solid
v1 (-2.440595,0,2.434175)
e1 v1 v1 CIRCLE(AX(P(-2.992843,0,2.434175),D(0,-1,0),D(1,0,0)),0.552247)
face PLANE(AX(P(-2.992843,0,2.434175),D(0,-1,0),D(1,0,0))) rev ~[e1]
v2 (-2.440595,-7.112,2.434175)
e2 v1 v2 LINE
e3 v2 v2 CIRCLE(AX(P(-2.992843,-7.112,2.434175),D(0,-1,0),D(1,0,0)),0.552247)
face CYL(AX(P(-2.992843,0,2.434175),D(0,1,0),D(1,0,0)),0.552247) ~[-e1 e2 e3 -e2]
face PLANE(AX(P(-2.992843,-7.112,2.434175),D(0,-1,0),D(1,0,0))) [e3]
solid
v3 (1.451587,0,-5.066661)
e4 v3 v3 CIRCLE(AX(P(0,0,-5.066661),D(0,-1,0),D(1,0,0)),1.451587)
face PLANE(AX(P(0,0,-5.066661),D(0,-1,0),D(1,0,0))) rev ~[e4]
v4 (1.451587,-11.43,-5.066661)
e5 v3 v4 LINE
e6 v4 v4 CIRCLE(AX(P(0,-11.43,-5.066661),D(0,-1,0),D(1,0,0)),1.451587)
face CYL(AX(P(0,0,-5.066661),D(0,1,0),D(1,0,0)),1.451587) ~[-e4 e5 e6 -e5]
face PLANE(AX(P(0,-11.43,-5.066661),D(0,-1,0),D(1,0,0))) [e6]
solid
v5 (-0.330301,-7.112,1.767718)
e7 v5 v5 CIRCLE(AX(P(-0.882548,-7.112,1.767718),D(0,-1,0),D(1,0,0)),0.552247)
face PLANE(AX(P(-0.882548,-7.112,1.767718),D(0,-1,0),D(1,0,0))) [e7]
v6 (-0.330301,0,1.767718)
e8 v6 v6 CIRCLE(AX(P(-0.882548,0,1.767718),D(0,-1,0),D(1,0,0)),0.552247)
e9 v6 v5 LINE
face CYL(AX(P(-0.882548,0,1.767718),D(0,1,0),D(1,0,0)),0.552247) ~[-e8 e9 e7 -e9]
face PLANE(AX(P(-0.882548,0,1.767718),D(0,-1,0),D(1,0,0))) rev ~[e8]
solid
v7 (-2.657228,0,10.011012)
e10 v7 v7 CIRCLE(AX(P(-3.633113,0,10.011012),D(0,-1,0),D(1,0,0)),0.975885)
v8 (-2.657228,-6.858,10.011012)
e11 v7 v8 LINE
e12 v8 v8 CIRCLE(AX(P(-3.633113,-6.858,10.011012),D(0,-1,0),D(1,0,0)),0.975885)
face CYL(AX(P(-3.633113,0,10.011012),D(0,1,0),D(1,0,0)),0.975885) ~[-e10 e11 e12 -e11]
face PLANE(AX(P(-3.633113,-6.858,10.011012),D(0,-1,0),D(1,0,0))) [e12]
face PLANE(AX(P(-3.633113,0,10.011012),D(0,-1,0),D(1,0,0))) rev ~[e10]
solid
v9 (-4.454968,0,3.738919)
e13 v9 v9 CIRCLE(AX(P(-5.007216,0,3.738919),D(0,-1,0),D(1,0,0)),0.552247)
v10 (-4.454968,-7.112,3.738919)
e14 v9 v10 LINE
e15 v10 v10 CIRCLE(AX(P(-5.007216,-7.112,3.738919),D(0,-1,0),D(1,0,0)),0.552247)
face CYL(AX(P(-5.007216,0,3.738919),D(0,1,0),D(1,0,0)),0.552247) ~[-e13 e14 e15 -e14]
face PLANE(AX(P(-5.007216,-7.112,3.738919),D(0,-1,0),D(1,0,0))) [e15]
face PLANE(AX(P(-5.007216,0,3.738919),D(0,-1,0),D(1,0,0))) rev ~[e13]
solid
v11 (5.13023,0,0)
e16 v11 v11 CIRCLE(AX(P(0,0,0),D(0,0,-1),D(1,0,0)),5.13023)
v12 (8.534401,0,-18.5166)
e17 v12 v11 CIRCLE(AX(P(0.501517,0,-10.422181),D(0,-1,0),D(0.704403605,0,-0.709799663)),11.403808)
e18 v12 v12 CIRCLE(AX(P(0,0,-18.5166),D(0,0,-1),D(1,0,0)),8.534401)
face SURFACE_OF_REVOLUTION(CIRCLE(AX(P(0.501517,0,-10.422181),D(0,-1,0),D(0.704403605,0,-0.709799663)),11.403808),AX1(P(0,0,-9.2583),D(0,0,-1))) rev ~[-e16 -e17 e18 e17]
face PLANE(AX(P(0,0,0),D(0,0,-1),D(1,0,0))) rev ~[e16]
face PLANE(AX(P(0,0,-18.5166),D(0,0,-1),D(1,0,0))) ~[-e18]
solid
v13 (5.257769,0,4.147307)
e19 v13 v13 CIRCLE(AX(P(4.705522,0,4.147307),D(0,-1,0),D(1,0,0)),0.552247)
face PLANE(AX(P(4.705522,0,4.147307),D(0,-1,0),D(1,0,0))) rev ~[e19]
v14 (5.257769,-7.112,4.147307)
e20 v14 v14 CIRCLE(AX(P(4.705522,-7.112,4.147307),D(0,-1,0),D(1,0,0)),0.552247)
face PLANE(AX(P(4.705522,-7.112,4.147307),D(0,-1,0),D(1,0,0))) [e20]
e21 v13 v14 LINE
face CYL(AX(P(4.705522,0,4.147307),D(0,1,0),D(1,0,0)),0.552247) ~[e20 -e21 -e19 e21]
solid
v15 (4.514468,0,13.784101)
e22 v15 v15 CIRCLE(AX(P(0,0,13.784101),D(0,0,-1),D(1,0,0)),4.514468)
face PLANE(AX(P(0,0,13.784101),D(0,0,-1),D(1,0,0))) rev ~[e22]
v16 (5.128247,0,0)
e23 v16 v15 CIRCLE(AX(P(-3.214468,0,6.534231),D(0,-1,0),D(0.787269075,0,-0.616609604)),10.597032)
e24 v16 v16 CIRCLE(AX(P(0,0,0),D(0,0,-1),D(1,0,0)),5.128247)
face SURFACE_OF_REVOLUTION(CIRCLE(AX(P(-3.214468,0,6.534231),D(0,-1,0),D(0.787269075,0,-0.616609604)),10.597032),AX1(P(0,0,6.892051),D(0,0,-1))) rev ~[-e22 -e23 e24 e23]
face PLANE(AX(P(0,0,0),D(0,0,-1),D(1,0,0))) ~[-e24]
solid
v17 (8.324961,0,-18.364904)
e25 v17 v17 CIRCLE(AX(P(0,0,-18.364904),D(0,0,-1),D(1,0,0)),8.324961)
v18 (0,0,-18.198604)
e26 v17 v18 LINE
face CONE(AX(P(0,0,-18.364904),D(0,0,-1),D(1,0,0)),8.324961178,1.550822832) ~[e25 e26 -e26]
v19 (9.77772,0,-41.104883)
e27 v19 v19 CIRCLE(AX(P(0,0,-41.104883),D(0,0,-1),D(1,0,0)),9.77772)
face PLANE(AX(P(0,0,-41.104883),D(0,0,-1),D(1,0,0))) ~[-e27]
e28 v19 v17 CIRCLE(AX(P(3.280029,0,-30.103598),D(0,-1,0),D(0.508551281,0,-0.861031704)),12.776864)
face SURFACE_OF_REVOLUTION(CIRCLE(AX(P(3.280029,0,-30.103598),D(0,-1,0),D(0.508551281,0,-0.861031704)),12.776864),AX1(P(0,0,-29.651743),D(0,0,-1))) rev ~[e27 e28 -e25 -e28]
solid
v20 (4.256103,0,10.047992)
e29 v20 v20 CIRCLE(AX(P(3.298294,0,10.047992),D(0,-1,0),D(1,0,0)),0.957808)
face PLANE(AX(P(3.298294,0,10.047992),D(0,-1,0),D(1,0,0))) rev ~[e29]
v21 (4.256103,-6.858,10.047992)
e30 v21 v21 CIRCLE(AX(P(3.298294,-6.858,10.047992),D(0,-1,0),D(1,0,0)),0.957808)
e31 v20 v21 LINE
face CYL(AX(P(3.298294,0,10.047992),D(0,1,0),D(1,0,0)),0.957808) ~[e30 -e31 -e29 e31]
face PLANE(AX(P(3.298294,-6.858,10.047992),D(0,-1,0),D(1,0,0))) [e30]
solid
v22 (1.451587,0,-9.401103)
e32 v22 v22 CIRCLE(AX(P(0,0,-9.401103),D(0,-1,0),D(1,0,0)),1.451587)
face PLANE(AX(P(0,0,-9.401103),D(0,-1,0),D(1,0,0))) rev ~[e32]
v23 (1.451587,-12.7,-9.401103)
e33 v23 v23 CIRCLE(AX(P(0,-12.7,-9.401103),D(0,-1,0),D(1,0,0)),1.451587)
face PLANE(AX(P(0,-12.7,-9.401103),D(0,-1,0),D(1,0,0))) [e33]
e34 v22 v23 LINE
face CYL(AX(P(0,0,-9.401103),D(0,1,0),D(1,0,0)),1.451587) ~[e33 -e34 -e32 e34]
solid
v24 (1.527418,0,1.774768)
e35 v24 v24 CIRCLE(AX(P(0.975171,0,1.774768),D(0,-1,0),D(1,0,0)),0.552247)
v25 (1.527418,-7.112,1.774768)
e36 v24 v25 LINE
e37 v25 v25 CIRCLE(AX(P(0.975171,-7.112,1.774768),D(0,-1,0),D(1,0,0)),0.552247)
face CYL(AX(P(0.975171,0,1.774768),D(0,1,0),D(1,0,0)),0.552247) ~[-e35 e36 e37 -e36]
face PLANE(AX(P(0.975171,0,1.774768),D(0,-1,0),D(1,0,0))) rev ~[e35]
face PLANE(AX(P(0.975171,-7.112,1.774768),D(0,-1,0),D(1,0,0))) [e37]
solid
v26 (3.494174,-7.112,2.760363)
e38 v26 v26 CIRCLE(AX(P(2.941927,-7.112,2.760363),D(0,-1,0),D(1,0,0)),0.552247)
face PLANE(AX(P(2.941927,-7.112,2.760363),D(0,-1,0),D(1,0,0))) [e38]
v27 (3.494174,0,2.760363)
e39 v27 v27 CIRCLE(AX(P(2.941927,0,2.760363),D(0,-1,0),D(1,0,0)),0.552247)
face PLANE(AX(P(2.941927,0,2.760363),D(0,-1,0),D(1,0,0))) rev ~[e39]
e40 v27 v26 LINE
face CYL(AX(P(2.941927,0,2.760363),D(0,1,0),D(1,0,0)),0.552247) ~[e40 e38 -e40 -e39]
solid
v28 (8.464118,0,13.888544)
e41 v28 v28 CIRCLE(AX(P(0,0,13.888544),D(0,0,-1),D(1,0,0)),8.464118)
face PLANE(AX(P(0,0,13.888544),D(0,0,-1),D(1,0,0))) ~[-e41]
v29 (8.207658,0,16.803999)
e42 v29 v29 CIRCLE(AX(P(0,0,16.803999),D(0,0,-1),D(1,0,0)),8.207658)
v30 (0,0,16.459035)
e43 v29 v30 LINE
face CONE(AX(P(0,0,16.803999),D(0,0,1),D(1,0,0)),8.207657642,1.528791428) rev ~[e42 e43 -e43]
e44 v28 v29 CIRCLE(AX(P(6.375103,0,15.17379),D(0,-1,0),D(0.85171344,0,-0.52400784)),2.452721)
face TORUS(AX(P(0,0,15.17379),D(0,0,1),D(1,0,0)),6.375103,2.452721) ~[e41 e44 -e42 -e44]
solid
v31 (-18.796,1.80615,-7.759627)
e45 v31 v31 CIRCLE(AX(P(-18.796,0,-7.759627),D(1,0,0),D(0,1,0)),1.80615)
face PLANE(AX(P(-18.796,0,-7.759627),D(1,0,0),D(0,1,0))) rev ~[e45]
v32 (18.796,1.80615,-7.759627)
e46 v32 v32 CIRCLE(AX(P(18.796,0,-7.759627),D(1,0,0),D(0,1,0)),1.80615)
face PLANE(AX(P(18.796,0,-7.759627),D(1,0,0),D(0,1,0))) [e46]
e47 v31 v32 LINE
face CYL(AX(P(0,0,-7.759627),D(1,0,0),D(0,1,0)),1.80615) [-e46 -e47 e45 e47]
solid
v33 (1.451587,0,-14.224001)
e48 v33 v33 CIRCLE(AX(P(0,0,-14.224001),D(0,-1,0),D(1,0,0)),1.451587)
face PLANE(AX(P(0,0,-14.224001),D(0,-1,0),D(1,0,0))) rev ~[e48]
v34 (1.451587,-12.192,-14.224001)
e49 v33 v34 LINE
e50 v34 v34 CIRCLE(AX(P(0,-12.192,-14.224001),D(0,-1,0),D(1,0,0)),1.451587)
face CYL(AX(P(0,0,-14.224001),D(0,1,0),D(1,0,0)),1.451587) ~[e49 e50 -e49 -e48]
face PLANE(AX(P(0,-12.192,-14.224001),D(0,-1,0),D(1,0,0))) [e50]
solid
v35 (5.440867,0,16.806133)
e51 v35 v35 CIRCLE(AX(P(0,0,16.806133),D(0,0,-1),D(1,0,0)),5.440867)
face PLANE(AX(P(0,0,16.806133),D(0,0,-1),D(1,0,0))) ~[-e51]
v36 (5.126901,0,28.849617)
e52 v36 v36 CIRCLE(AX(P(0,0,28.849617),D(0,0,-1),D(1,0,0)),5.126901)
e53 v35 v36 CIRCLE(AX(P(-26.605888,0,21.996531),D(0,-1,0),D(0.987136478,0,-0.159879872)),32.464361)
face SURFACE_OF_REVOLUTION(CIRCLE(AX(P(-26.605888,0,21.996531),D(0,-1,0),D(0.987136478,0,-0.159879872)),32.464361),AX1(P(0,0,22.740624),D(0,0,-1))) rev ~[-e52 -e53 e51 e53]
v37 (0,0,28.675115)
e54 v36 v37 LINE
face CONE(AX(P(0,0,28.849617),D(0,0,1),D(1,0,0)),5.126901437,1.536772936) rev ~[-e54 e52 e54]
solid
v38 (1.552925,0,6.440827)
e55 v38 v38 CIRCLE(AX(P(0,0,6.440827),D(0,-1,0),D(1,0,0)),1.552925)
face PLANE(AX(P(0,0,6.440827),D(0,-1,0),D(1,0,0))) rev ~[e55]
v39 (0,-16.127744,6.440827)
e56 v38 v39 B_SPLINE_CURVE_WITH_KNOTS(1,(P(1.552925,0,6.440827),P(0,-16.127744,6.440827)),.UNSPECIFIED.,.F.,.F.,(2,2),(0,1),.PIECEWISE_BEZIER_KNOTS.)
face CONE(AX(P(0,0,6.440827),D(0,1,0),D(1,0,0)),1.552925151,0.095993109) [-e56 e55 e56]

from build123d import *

# Parameters (mm, degrees)
F10_R     = 2.9031743956
F11_DEPTH = 22.86
F12_R     = 2.9031743956
F13_DEPTH = 25.4
F14_R     = 2.9031743956
F15_DEPTH = 24.384
F16_R     = 1.9156165745
F17_DEPTH = 13.716
F16_R_2   = 1.9517692667
F18_R     = 1.1044945862
F19_DEPTH = 14.224
F20_R     = 3.1058503017
F22_R     = 3.6123006976
F23_DEPTH = 37.592
F24_SCALE = 0.5


# Not quite as in the source:
# - an extrude whose draft closes it to a point is written as a loft to that point


with BuildPart() as f1:
    # F0 (on Front) → F1 (revolve)
    with BuildSketch(Plane.XZ):
        with BuildLine():
            Line((0, -37.033200264), (17.0688014477, -37.033200264))
            ThreePointArc((17.0688014477, -37.033200264), (23.4347196146, -16.7204253185), (10.260459967, 0))
            Line((10.260459967, 0), (0, 0))
            Line((0, 0), (0, -37.033200264))
        make_face()
    revolve(axis=Axis((0, 0, -18.516600132), (0, 0, -1)))


with BuildPart() as f3:
    # F2 (on Front) → F3 (revolve)
    with BuildSketch(Plane.XZ):
        with BuildLine():
            Line((0, -82.2097659111), (19.5554401726, -82.2097659111))
            ThreePointArc((19.5554401726, -82.2097659111), (32.0617990935, -58.5779997195), (16.649922356, -36.7298088968))
            Line((16.649922356, -36.7298088968), (0, -36.3972075284))
            Line((0, -36.3972075284), (0, -82.2097659111))
        make_face()
    revolve(axis=Axis((0, 0, -59.3034867197), (0, 0, -1)))


with BuildPart() as f5:
    # F4 (on Front) → F5 (revolve)
    with BuildSketch(Plane.XZ):
        with BuildLine():
            Line((0, 0), (10.2564934641, 0))
            ThreePointArc((10.2564934641, 0), (14.744146127, 14.0112577102), (9.0289367748, 27.5682024658))
            Line((9.0289367748, 27.5682024658), (0, 27.5682024658))
            Line((0, 27.5682024658), (0, 0))
        make_face()
    revolve(axis=Axis((0, 0, 13.7841012329), (0, 0, -1)))


with BuildPart() as f7:
    # F6 (on Front) → F7 (revolve)
    with BuildSketch(Plane.XZ):
        with BuildLine():
            Line((0, 27.777088806), (16.9282369316, 27.777088806))
            ThreePointArc((16.9282369316, 27.777088806), (17.6367783881, 30.7774312562), (16.4153152843, 33.6079989907))
            Line((16.4153152843, 33.6079989907), (0, 32.9180695117))
            Line((0, 32.9180695117), (0, 27.777088806))
        make_face()
    revolve(axis=Axis((0, 0, 30.3475791588), (0, 0, -1)))


with BuildPart() as f9:
    # F8 (on Front) → F9 (revolve)
    with BuildSketch(Plane.XZ):
        with BuildLine():
            Line((0, 33.6122661829), (10.8817331493, 33.6122661829))
            ThreePointArc((10.8817331493, 33.6122661829), (11.6948933703, 45.6851331029), (10.2538028732, 57.6992332935))
            Line((10.2538028732, 57.6992332935), (0, 57.3502294719))
            Line((0, 57.3502294719), (0, 33.6122661829))
        make_face()
    revolve(axis=Axis((0, 0, 45.4812478274), (0, 0, -1)))


with BuildPart() as f11:
    # F10 (on Front) → F11 (new body)
    with BuildSketch(Plane.XZ):
        with Locations((0, -10.1333223283)):
            Circle(F10_R)
    extrude(amount=F11_DEPTH)


with BuildPart() as f13:
    # F12 (on Front) → F13 (new body)
    with BuildSketch(Plane.XZ):
        with Locations((0, -18.8022069633)):
            Circle(F12_R)
    extrude(amount=F13_DEPTH)


with BuildPart() as f15:
    # F14 (on Front) → F15 (new body)
    with BuildSketch(Plane.XZ):
        with Locations((0, -28.4480024129)):
            Circle(F14_R)
    extrude(amount=F15_DEPTH)


with BuildPart() as f17:
    # F16 (on Front) → F17 (new body)
    with BuildSketch(Plane.XZ):
        with Locations((6.5965889953, 20.0959835202)):
            Circle(F16_R)
    extrude(amount=F17_DEPTH)


with BuildPart() as f17b:
    # F16 (on Front) → F17, piece 2 (new body)
    with BuildSketch(Plane.XZ):
        with Locations((-7.2662262246, 20.0220234692)):
            Circle(F16_R_2)
    extrude(amount=F17_DEPTH)


with BuildPart() as f19:
    # F18 (on Front) → F19 (new body)
    with BuildSketch(Plane.XZ):
        with Locations((-10.0144315511, 7.4778371491)):
            Circle(F18_R)
    extrude(amount=F19_DEPTH)


with BuildPart() as f19b:
    # F18 (on Front) → F19, piece 2 (new body)
    with BuildSketch(Plane.XZ):
        with Locations((-5.9856851585, 4.8683495261)):
            Circle(F18_R)
    extrude(amount=F19_DEPTH)


with BuildPart() as f19c:
    # F18 (on Front) → F19, piece 3 (new body)
    with BuildSketch(Plane.XZ):
        with Locations((-1.765095978, 3.535436932)):
            Circle(F18_R)
    extrude(amount=F19_DEPTH)


with BuildPart() as f19d:
    # F18 (on Front) → F19, piece 4 (new body)
    with BuildSketch(Plane.XZ):
        with Locations((1.9503422081, 3.5495357588)):
            Circle(F18_R)
    extrude(amount=F19_DEPTH)


with BuildPart() as f19e:
    # F18 (on Front) → F19, piece 5 (new body)
    with BuildSketch(Plane.XZ):
        with Locations((9.4110434875, 8.2946131006)):
            Circle(F18_R)
    extrude(amount=F19_DEPTH)


with BuildPart() as f19f:
    # F18 (on Front) → F19, piece 6 (new body)
    with BuildSketch(Plane.XZ):
        with Locations((5.8838534169, 5.5207260884)):
            Circle(F18_R)
    extrude(amount=F19_DEPTH)


with BuildPart() as f21:
    # F20 (on Front) → F21 section 0
    with BuildSketch(Plane.XZ, mode=Mode.PRIVATE) as f21_s0:
        with Locations((0, 12.8816543147)):
            Circle(F20_R)
    loft([f21_s0.sketch, Vertex(0, -32.2554886542, 12.8816543147)], ruled=True)


with BuildPart() as f23:
    # F22 (on Right) → F23 (new body, symmetric)
    with BuildSketch(Plane.YZ):
        with Locations((0, -15.5192539096)):
            Circle(F22_R)
    extrude(amount=F23_DEPTH, both=True)


with BuildPart() as f17b_1:
    # F24: moved
    add(f17b.part.scale(F24_SCALE))


with BuildPart() as f19_1:
    # F24: moved
    add(f19.part.scale(F24_SCALE))


with BuildPart() as f19b_1:
    # F24: moved
    add(f19b.part.scale(F24_SCALE))


with BuildPart() as f19e_1:
    # F24: moved
    add(f19e.part.scale(F24_SCALE))


with BuildPart() as f19f_1:
    # F24: moved
    add(f19f.part.scale(F24_SCALE))


with BuildPart() as f1_1:
    # F24: moved
    add(f1.part.scale(F24_SCALE))


with BuildPart() as f3_1:
    # F24: moved
    add(f3.part.scale(F24_SCALE))


with BuildPart() as f5_1:
    # F24: moved
    add(f5.part.scale(F24_SCALE))


with BuildPart() as f7_1:
    # F24: moved
    add(f7.part.scale(F24_SCALE))


with BuildPart() as f9_1:
    # F24: moved
    add(f9.part.scale(F24_SCALE))


with BuildPart() as f11_1:
    # F24: moved
    add(f11.part.scale(F24_SCALE))


with BuildPart() as f13_1:
    # F24: moved
    add(f13.part.scale(F24_SCALE))


with BuildPart() as f15_1:
    # F24: moved
    add(f15.part.scale(F24_SCALE))


with BuildPart() as f17_1:
    # F24: moved
    add(f17.part.scale(F24_SCALE))


with BuildPart() as f23_1:
    # F24: moved
    add(f23.part.scale(F24_SCALE))


with BuildPart() as f19c_1:
    # F24: moved
    add(f19c.part.scale(F24_SCALE))


with BuildPart() as f19d_1:
    # F24: moved
    add(f19d.part.scale(F24_SCALE))


with BuildPart() as f21_1:
    # F24: moved
    add(f21.part.scale(F24_SCALE))


solid = Compound([f17b_1.part, f19_1.part, f19b_1.part, f19e_1.part, f19f_1.part, f1_1.part, f3_1.part, f5_1.part, f7_1.part, f9_1.part, f11_1.part, f13_1.part, f15_1.part, f17_1.part, f23_1.part, f19c_1.part, f19d_1.part, f21_1.part])
